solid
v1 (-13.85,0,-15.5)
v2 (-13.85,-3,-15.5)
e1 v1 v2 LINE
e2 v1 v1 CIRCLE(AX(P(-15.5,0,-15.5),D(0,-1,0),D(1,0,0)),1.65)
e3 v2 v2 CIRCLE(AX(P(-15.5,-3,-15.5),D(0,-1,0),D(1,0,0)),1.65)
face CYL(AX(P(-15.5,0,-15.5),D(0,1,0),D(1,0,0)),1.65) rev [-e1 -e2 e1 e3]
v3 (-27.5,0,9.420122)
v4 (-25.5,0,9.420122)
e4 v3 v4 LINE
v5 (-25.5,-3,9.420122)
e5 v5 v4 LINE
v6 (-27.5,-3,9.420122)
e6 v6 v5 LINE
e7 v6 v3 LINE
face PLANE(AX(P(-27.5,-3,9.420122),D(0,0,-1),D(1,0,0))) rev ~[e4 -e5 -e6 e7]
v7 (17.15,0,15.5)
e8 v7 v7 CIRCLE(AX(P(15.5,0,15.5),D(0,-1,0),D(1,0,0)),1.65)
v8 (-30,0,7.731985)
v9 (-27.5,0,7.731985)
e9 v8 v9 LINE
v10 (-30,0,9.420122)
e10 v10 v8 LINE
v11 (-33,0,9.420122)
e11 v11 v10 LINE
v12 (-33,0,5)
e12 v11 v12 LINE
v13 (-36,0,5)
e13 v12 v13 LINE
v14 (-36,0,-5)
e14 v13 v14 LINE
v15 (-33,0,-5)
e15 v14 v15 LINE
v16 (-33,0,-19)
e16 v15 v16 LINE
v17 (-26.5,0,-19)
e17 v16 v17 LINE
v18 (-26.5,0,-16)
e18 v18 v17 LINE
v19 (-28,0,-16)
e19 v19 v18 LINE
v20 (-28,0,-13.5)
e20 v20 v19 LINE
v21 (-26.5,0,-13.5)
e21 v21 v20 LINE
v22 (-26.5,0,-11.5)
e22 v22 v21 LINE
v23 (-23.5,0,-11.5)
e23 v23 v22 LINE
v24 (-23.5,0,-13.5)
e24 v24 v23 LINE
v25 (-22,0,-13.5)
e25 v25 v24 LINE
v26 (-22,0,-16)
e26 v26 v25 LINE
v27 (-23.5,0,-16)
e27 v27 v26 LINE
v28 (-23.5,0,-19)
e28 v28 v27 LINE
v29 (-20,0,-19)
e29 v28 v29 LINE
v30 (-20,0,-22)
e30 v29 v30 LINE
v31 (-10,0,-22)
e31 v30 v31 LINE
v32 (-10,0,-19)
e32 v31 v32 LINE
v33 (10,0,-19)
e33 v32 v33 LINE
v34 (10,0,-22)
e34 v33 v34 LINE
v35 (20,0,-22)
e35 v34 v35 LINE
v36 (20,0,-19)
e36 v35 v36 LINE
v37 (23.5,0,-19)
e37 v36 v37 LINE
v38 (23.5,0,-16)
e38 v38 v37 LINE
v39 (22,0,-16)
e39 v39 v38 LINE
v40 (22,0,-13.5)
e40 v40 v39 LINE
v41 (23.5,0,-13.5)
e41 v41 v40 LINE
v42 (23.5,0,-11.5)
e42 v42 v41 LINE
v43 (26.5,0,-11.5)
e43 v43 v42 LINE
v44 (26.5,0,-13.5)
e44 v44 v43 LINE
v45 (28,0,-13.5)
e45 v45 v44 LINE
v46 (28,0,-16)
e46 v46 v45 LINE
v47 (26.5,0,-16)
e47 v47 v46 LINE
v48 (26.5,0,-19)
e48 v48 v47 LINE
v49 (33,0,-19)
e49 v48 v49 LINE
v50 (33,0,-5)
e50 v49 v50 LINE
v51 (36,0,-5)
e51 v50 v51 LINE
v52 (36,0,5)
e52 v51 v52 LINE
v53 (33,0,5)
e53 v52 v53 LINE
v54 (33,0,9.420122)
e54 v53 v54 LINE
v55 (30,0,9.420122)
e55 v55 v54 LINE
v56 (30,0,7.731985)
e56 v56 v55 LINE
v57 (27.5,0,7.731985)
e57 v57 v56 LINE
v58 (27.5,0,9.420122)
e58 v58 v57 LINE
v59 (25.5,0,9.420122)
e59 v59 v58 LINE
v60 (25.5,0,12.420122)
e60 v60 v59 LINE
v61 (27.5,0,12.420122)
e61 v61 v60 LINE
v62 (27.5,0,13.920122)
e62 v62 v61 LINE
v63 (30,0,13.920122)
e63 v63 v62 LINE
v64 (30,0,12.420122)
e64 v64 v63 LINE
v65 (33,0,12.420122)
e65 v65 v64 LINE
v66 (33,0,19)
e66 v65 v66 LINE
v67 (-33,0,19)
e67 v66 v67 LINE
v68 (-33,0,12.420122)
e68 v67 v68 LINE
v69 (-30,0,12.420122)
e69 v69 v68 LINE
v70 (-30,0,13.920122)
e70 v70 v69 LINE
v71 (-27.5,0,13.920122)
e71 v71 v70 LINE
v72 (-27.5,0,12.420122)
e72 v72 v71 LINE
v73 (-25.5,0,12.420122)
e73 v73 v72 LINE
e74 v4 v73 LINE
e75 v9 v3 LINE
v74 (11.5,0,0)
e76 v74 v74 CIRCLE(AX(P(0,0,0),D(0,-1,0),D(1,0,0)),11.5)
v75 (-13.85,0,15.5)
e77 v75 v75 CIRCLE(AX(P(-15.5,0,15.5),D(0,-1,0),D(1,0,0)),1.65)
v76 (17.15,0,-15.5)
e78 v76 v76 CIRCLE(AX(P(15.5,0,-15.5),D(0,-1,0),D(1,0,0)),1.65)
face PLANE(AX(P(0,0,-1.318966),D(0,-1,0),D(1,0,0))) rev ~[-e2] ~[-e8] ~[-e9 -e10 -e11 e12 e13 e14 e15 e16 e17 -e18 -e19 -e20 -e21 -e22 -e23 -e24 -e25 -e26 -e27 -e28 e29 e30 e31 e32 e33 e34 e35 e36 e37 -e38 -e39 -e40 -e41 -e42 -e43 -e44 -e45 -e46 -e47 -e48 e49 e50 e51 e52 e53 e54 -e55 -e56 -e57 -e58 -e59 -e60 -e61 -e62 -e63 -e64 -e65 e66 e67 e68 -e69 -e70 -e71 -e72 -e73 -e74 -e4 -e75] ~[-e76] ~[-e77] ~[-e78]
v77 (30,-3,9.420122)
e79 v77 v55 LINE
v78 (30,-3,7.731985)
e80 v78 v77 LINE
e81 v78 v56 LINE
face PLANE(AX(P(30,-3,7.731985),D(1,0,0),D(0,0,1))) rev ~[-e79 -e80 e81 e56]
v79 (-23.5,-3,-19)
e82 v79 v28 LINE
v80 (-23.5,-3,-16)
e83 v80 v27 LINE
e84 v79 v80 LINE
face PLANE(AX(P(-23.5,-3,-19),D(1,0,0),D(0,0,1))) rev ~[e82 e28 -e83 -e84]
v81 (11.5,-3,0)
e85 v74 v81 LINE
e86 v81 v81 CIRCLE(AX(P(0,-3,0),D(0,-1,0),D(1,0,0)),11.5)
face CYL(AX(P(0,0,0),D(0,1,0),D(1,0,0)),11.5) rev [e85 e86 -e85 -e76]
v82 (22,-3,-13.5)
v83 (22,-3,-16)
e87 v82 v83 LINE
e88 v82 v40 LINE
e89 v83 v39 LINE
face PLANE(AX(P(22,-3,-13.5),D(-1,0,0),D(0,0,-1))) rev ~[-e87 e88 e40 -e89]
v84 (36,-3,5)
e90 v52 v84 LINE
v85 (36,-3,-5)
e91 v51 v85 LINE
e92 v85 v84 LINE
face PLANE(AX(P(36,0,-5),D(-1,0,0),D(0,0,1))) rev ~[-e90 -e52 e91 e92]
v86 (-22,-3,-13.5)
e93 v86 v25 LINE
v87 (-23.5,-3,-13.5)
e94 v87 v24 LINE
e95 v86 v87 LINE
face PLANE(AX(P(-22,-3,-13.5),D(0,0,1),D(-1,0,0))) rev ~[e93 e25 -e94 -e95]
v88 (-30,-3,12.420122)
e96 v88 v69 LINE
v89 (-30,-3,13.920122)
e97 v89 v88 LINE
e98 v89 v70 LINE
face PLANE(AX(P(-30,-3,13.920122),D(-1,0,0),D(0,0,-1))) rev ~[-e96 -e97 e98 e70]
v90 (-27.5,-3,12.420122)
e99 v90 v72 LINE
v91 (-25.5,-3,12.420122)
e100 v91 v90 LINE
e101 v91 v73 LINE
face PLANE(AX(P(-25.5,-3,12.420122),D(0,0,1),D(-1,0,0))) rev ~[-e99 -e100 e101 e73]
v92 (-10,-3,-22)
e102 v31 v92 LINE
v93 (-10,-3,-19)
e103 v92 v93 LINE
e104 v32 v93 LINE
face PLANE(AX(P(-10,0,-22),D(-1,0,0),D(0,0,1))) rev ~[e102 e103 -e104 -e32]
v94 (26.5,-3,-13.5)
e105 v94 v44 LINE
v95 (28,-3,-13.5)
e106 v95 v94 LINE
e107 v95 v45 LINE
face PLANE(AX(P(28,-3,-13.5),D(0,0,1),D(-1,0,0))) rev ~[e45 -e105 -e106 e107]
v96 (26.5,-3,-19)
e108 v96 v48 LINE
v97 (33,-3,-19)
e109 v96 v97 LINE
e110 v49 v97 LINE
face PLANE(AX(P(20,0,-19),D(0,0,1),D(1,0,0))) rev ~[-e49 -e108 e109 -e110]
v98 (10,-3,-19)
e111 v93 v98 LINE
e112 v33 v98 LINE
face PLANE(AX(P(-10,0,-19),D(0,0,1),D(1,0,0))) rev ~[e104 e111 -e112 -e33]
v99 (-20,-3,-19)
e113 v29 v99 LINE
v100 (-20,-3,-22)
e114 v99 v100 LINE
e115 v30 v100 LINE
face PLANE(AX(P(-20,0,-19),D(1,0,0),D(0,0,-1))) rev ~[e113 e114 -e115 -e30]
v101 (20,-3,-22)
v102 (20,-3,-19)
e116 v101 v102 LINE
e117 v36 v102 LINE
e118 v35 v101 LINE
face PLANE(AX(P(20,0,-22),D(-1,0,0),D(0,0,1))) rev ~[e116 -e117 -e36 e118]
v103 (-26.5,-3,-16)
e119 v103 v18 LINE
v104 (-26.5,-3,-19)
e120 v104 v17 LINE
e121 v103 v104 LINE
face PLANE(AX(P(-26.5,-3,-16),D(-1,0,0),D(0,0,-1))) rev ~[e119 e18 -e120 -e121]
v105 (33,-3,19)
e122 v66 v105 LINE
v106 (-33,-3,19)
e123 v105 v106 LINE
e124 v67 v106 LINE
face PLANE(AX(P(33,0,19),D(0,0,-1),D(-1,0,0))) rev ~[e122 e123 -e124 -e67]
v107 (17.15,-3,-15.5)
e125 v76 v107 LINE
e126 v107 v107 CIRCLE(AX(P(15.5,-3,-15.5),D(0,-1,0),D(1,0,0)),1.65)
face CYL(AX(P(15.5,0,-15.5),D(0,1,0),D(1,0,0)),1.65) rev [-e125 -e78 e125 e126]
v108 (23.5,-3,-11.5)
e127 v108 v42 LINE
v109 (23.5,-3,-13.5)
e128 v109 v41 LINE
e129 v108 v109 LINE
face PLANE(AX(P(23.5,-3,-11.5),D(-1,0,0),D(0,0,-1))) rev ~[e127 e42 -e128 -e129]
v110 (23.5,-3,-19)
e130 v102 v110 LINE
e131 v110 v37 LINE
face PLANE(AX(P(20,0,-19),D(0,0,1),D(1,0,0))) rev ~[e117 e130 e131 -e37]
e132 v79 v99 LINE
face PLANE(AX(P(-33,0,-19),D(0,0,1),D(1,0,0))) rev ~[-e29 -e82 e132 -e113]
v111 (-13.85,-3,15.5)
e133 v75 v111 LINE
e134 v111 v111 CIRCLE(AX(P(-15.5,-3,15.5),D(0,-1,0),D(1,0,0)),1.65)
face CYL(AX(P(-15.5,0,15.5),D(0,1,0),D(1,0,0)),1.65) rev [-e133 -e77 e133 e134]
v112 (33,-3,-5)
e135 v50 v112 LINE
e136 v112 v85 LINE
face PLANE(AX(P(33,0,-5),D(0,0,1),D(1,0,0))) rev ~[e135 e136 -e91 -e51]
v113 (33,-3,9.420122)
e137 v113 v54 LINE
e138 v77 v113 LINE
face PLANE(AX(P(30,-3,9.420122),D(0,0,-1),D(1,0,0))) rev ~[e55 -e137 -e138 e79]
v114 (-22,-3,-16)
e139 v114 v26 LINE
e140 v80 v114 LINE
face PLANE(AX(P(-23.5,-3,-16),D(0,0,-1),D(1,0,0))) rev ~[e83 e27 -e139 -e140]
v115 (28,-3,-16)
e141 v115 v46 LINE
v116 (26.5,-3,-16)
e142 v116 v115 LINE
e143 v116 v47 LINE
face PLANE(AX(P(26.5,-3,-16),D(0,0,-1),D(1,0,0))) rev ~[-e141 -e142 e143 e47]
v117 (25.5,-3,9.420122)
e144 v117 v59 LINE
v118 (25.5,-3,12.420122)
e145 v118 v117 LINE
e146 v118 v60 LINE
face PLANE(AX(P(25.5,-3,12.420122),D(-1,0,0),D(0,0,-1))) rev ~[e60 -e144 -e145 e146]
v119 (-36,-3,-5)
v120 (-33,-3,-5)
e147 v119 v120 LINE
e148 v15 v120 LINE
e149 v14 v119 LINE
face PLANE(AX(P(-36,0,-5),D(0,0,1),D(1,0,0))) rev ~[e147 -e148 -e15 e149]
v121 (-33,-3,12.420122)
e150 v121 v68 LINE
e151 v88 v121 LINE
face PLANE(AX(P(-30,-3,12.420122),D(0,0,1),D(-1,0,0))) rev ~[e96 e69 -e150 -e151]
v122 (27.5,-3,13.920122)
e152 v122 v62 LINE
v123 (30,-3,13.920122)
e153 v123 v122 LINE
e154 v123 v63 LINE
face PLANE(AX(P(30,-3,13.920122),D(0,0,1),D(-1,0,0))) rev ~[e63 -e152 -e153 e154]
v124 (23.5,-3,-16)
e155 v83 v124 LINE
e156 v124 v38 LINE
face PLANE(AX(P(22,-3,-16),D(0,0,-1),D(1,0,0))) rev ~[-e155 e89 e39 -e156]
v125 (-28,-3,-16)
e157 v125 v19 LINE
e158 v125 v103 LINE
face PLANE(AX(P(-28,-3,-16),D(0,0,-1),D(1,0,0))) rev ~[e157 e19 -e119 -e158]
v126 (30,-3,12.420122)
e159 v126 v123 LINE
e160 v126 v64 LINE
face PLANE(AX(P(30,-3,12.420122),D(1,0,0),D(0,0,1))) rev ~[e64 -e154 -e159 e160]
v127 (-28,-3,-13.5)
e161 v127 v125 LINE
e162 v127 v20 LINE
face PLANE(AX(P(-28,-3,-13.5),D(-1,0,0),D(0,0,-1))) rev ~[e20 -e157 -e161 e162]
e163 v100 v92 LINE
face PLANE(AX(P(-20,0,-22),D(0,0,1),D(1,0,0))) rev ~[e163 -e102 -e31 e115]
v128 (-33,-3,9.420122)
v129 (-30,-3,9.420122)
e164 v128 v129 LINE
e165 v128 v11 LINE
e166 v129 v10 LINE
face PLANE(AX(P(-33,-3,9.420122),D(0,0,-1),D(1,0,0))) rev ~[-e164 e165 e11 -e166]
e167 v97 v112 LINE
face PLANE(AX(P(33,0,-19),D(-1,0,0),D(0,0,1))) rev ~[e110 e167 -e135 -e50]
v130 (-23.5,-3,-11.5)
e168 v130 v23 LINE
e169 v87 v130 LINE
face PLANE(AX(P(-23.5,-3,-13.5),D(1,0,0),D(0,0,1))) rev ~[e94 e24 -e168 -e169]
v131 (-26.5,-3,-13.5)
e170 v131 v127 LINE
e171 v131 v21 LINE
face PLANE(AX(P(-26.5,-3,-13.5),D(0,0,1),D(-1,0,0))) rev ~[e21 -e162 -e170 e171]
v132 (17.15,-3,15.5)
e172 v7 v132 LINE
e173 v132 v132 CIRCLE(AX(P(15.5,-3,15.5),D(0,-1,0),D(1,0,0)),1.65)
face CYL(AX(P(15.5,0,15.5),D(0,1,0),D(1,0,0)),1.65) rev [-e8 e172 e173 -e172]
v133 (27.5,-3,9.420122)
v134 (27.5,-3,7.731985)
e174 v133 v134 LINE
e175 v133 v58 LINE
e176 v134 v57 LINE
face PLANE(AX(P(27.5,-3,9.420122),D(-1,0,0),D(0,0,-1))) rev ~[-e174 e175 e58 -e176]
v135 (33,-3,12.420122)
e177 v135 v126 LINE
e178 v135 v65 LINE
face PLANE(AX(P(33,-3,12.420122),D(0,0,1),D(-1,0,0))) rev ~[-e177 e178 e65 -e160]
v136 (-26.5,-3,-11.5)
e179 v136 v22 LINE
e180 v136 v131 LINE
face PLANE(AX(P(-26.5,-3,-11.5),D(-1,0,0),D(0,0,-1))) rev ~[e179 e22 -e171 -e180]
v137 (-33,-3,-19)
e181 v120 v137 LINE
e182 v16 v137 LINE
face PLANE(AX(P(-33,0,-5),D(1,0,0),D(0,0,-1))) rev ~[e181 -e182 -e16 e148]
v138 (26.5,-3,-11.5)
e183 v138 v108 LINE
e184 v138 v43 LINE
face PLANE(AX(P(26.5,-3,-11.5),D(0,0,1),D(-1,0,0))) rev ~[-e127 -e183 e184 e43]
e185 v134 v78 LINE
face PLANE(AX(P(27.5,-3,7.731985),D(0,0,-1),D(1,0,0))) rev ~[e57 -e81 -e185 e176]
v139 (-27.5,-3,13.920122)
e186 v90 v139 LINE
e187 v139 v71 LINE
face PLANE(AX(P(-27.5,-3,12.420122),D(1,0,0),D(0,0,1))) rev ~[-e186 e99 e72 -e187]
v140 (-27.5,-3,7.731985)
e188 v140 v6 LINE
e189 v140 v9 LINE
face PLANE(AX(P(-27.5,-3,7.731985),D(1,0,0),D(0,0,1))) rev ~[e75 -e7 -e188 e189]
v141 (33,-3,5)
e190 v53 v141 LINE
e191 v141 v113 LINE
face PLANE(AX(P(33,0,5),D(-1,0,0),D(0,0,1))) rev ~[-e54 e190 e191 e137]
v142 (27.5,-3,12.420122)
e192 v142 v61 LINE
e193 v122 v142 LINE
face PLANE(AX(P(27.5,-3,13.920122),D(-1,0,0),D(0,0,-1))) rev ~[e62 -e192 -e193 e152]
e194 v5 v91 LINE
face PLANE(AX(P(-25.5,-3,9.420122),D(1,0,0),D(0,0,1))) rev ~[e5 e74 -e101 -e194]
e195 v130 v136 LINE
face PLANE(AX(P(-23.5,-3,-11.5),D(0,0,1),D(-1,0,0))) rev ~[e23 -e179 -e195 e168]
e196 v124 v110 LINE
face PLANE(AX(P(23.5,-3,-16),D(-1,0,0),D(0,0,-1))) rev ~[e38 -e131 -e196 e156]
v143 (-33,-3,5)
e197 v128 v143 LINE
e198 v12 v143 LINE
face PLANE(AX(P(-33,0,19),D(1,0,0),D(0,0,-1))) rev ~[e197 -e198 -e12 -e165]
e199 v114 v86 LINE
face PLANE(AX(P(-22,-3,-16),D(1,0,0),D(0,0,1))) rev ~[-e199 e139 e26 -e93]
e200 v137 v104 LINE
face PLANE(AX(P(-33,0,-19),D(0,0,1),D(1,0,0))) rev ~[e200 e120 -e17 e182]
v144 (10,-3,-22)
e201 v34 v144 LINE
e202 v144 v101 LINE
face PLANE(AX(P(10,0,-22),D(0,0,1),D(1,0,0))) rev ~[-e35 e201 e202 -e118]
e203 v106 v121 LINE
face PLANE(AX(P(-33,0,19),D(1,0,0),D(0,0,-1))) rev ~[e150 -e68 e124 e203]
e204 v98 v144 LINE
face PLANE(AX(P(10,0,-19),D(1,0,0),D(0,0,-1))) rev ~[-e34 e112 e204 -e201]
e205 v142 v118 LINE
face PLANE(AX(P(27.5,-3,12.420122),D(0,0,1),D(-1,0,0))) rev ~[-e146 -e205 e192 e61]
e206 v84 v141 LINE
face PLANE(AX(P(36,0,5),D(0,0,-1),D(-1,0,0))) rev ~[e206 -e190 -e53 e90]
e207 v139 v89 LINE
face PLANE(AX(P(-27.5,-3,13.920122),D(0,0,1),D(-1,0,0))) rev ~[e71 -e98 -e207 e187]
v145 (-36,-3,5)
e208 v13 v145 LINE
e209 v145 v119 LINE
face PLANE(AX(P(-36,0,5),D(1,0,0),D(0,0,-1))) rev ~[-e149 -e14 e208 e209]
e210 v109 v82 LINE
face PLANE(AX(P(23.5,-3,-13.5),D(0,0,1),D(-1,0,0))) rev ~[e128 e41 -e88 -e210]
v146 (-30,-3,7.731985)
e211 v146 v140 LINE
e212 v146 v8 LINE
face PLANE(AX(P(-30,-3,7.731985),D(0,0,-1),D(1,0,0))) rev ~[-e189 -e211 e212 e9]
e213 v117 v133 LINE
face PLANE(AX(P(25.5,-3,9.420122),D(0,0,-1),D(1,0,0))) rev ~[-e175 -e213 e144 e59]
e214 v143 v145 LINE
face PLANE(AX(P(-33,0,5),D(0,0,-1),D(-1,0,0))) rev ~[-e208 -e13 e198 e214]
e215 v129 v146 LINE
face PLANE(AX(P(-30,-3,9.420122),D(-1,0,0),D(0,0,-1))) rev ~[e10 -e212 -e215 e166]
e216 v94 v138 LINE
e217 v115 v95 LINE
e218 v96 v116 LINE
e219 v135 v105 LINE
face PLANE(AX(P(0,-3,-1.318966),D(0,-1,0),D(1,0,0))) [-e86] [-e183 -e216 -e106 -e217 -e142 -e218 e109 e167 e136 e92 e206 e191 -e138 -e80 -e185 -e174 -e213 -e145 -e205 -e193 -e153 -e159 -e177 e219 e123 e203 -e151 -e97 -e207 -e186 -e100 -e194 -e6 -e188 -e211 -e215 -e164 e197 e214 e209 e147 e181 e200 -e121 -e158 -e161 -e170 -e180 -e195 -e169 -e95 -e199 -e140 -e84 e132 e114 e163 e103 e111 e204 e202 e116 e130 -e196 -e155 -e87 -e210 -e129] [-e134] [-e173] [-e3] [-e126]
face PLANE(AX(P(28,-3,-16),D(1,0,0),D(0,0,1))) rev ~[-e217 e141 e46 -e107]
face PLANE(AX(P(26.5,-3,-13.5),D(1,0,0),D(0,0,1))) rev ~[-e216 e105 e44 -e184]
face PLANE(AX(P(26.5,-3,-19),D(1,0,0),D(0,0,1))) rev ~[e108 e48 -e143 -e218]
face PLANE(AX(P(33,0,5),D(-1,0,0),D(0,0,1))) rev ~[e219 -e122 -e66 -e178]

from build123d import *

# Parameters (mm, degrees)
F0_R     = 1.65
F0_R_2   = 11.5
F1_DEPTH = 3
F3_DEPTH = 3


# Not quite as in the source:
# - a feature names something its author has since deleted; it is built from what else it names


with BuildPart() as f1:
    # F0 (on Front) → F1 (new body)
    with BuildSketch(Plane.XZ):
        Polygon((33, 5), (33, 19), (-33, 19), (-33, 5), (-36, 5), (-36, -5), (-33, -5), (-33, -19), (-20, -19), (-20, -22), (-10, -22), (-10, -19), (0, -19), (10, -19), (10, -22), (20, -22), (20, -19), (33, -19), (33, -5), (36, -5), (36, 5), align=None)
        with Locations((-15.5, -15.5)):
            Circle(F0_R, mode=Mode.SUBTRACT)
        with Locations((15.5, -15.5)):
            Circle(F0_R, mode=Mode.SUBTRACT)
        with Locations((-15.5, 15.5)):
            Circle(F0_R, mode=Mode.SUBTRACT)
        Circle(F0_R_2, mode=Mode.SUBTRACT)
        with Locations((15.5, 15.5)):
            Circle(F0_R, mode=Mode.SUBTRACT)
    extrude(amount=F1_DEPTH)

    # F2 (on face) → F3 (cut, through all)
    with BuildSketch(Plane.XZ.offset(3)):
        Polygon((23.5, -16), (23.5, -19), (26.5, -19), (26.5, -16), (28, -16), (28, -13.5), (26.5, -13.5), (26.5, -11.5), (23.5, -11.5), (23.5, -13.5), (22, -13.5), (22, -16), align=None)
        Polygon((-26.5, -19), (-23.5, -19), (-23.5, -16), (-22, -16), (-22, -13.5), (-23.5, -13.5), (-23.5, -11.5), (-26.5, -11.5), (-26.5, -13.5), (-28, -13.5), (-28, -16), (-26.5, -16), align=None)
        Polygon((30, 9.4201220199), (33, 9.4201220199), (33, 11), (33, 12.4201220199), (30, 12.4201220199), (30, 13.9201220199), (27.5, 13.9201220199), (27.5, 12.4201220199), (25.5, 12.4201220199), (25.5, 9.4201220199), (27.5, 9.4201220199), (27.5, 7.7319853008), (30, 7.7319853008), align=None)
        Polygon((-30, 12.4201220199), (-33, 12.4201220199), (-33, 11), (-33, 9.4201220199), (-30, 9.4201220199), (-30, 7.7319853008), (-27.5, 7.7319853008), (-27.5, 9.4201220199), (-25.5, 9.4201220199), (-25.5, 12.4201220199), (-27.5, 12.4201220199), (-27.5, 13.9201220199), (-30, 13.9201220199), align=None)
    extrude(amount=-F3_DEPTH, mode=Mode.SUBTRACT)


solid = f1.part
